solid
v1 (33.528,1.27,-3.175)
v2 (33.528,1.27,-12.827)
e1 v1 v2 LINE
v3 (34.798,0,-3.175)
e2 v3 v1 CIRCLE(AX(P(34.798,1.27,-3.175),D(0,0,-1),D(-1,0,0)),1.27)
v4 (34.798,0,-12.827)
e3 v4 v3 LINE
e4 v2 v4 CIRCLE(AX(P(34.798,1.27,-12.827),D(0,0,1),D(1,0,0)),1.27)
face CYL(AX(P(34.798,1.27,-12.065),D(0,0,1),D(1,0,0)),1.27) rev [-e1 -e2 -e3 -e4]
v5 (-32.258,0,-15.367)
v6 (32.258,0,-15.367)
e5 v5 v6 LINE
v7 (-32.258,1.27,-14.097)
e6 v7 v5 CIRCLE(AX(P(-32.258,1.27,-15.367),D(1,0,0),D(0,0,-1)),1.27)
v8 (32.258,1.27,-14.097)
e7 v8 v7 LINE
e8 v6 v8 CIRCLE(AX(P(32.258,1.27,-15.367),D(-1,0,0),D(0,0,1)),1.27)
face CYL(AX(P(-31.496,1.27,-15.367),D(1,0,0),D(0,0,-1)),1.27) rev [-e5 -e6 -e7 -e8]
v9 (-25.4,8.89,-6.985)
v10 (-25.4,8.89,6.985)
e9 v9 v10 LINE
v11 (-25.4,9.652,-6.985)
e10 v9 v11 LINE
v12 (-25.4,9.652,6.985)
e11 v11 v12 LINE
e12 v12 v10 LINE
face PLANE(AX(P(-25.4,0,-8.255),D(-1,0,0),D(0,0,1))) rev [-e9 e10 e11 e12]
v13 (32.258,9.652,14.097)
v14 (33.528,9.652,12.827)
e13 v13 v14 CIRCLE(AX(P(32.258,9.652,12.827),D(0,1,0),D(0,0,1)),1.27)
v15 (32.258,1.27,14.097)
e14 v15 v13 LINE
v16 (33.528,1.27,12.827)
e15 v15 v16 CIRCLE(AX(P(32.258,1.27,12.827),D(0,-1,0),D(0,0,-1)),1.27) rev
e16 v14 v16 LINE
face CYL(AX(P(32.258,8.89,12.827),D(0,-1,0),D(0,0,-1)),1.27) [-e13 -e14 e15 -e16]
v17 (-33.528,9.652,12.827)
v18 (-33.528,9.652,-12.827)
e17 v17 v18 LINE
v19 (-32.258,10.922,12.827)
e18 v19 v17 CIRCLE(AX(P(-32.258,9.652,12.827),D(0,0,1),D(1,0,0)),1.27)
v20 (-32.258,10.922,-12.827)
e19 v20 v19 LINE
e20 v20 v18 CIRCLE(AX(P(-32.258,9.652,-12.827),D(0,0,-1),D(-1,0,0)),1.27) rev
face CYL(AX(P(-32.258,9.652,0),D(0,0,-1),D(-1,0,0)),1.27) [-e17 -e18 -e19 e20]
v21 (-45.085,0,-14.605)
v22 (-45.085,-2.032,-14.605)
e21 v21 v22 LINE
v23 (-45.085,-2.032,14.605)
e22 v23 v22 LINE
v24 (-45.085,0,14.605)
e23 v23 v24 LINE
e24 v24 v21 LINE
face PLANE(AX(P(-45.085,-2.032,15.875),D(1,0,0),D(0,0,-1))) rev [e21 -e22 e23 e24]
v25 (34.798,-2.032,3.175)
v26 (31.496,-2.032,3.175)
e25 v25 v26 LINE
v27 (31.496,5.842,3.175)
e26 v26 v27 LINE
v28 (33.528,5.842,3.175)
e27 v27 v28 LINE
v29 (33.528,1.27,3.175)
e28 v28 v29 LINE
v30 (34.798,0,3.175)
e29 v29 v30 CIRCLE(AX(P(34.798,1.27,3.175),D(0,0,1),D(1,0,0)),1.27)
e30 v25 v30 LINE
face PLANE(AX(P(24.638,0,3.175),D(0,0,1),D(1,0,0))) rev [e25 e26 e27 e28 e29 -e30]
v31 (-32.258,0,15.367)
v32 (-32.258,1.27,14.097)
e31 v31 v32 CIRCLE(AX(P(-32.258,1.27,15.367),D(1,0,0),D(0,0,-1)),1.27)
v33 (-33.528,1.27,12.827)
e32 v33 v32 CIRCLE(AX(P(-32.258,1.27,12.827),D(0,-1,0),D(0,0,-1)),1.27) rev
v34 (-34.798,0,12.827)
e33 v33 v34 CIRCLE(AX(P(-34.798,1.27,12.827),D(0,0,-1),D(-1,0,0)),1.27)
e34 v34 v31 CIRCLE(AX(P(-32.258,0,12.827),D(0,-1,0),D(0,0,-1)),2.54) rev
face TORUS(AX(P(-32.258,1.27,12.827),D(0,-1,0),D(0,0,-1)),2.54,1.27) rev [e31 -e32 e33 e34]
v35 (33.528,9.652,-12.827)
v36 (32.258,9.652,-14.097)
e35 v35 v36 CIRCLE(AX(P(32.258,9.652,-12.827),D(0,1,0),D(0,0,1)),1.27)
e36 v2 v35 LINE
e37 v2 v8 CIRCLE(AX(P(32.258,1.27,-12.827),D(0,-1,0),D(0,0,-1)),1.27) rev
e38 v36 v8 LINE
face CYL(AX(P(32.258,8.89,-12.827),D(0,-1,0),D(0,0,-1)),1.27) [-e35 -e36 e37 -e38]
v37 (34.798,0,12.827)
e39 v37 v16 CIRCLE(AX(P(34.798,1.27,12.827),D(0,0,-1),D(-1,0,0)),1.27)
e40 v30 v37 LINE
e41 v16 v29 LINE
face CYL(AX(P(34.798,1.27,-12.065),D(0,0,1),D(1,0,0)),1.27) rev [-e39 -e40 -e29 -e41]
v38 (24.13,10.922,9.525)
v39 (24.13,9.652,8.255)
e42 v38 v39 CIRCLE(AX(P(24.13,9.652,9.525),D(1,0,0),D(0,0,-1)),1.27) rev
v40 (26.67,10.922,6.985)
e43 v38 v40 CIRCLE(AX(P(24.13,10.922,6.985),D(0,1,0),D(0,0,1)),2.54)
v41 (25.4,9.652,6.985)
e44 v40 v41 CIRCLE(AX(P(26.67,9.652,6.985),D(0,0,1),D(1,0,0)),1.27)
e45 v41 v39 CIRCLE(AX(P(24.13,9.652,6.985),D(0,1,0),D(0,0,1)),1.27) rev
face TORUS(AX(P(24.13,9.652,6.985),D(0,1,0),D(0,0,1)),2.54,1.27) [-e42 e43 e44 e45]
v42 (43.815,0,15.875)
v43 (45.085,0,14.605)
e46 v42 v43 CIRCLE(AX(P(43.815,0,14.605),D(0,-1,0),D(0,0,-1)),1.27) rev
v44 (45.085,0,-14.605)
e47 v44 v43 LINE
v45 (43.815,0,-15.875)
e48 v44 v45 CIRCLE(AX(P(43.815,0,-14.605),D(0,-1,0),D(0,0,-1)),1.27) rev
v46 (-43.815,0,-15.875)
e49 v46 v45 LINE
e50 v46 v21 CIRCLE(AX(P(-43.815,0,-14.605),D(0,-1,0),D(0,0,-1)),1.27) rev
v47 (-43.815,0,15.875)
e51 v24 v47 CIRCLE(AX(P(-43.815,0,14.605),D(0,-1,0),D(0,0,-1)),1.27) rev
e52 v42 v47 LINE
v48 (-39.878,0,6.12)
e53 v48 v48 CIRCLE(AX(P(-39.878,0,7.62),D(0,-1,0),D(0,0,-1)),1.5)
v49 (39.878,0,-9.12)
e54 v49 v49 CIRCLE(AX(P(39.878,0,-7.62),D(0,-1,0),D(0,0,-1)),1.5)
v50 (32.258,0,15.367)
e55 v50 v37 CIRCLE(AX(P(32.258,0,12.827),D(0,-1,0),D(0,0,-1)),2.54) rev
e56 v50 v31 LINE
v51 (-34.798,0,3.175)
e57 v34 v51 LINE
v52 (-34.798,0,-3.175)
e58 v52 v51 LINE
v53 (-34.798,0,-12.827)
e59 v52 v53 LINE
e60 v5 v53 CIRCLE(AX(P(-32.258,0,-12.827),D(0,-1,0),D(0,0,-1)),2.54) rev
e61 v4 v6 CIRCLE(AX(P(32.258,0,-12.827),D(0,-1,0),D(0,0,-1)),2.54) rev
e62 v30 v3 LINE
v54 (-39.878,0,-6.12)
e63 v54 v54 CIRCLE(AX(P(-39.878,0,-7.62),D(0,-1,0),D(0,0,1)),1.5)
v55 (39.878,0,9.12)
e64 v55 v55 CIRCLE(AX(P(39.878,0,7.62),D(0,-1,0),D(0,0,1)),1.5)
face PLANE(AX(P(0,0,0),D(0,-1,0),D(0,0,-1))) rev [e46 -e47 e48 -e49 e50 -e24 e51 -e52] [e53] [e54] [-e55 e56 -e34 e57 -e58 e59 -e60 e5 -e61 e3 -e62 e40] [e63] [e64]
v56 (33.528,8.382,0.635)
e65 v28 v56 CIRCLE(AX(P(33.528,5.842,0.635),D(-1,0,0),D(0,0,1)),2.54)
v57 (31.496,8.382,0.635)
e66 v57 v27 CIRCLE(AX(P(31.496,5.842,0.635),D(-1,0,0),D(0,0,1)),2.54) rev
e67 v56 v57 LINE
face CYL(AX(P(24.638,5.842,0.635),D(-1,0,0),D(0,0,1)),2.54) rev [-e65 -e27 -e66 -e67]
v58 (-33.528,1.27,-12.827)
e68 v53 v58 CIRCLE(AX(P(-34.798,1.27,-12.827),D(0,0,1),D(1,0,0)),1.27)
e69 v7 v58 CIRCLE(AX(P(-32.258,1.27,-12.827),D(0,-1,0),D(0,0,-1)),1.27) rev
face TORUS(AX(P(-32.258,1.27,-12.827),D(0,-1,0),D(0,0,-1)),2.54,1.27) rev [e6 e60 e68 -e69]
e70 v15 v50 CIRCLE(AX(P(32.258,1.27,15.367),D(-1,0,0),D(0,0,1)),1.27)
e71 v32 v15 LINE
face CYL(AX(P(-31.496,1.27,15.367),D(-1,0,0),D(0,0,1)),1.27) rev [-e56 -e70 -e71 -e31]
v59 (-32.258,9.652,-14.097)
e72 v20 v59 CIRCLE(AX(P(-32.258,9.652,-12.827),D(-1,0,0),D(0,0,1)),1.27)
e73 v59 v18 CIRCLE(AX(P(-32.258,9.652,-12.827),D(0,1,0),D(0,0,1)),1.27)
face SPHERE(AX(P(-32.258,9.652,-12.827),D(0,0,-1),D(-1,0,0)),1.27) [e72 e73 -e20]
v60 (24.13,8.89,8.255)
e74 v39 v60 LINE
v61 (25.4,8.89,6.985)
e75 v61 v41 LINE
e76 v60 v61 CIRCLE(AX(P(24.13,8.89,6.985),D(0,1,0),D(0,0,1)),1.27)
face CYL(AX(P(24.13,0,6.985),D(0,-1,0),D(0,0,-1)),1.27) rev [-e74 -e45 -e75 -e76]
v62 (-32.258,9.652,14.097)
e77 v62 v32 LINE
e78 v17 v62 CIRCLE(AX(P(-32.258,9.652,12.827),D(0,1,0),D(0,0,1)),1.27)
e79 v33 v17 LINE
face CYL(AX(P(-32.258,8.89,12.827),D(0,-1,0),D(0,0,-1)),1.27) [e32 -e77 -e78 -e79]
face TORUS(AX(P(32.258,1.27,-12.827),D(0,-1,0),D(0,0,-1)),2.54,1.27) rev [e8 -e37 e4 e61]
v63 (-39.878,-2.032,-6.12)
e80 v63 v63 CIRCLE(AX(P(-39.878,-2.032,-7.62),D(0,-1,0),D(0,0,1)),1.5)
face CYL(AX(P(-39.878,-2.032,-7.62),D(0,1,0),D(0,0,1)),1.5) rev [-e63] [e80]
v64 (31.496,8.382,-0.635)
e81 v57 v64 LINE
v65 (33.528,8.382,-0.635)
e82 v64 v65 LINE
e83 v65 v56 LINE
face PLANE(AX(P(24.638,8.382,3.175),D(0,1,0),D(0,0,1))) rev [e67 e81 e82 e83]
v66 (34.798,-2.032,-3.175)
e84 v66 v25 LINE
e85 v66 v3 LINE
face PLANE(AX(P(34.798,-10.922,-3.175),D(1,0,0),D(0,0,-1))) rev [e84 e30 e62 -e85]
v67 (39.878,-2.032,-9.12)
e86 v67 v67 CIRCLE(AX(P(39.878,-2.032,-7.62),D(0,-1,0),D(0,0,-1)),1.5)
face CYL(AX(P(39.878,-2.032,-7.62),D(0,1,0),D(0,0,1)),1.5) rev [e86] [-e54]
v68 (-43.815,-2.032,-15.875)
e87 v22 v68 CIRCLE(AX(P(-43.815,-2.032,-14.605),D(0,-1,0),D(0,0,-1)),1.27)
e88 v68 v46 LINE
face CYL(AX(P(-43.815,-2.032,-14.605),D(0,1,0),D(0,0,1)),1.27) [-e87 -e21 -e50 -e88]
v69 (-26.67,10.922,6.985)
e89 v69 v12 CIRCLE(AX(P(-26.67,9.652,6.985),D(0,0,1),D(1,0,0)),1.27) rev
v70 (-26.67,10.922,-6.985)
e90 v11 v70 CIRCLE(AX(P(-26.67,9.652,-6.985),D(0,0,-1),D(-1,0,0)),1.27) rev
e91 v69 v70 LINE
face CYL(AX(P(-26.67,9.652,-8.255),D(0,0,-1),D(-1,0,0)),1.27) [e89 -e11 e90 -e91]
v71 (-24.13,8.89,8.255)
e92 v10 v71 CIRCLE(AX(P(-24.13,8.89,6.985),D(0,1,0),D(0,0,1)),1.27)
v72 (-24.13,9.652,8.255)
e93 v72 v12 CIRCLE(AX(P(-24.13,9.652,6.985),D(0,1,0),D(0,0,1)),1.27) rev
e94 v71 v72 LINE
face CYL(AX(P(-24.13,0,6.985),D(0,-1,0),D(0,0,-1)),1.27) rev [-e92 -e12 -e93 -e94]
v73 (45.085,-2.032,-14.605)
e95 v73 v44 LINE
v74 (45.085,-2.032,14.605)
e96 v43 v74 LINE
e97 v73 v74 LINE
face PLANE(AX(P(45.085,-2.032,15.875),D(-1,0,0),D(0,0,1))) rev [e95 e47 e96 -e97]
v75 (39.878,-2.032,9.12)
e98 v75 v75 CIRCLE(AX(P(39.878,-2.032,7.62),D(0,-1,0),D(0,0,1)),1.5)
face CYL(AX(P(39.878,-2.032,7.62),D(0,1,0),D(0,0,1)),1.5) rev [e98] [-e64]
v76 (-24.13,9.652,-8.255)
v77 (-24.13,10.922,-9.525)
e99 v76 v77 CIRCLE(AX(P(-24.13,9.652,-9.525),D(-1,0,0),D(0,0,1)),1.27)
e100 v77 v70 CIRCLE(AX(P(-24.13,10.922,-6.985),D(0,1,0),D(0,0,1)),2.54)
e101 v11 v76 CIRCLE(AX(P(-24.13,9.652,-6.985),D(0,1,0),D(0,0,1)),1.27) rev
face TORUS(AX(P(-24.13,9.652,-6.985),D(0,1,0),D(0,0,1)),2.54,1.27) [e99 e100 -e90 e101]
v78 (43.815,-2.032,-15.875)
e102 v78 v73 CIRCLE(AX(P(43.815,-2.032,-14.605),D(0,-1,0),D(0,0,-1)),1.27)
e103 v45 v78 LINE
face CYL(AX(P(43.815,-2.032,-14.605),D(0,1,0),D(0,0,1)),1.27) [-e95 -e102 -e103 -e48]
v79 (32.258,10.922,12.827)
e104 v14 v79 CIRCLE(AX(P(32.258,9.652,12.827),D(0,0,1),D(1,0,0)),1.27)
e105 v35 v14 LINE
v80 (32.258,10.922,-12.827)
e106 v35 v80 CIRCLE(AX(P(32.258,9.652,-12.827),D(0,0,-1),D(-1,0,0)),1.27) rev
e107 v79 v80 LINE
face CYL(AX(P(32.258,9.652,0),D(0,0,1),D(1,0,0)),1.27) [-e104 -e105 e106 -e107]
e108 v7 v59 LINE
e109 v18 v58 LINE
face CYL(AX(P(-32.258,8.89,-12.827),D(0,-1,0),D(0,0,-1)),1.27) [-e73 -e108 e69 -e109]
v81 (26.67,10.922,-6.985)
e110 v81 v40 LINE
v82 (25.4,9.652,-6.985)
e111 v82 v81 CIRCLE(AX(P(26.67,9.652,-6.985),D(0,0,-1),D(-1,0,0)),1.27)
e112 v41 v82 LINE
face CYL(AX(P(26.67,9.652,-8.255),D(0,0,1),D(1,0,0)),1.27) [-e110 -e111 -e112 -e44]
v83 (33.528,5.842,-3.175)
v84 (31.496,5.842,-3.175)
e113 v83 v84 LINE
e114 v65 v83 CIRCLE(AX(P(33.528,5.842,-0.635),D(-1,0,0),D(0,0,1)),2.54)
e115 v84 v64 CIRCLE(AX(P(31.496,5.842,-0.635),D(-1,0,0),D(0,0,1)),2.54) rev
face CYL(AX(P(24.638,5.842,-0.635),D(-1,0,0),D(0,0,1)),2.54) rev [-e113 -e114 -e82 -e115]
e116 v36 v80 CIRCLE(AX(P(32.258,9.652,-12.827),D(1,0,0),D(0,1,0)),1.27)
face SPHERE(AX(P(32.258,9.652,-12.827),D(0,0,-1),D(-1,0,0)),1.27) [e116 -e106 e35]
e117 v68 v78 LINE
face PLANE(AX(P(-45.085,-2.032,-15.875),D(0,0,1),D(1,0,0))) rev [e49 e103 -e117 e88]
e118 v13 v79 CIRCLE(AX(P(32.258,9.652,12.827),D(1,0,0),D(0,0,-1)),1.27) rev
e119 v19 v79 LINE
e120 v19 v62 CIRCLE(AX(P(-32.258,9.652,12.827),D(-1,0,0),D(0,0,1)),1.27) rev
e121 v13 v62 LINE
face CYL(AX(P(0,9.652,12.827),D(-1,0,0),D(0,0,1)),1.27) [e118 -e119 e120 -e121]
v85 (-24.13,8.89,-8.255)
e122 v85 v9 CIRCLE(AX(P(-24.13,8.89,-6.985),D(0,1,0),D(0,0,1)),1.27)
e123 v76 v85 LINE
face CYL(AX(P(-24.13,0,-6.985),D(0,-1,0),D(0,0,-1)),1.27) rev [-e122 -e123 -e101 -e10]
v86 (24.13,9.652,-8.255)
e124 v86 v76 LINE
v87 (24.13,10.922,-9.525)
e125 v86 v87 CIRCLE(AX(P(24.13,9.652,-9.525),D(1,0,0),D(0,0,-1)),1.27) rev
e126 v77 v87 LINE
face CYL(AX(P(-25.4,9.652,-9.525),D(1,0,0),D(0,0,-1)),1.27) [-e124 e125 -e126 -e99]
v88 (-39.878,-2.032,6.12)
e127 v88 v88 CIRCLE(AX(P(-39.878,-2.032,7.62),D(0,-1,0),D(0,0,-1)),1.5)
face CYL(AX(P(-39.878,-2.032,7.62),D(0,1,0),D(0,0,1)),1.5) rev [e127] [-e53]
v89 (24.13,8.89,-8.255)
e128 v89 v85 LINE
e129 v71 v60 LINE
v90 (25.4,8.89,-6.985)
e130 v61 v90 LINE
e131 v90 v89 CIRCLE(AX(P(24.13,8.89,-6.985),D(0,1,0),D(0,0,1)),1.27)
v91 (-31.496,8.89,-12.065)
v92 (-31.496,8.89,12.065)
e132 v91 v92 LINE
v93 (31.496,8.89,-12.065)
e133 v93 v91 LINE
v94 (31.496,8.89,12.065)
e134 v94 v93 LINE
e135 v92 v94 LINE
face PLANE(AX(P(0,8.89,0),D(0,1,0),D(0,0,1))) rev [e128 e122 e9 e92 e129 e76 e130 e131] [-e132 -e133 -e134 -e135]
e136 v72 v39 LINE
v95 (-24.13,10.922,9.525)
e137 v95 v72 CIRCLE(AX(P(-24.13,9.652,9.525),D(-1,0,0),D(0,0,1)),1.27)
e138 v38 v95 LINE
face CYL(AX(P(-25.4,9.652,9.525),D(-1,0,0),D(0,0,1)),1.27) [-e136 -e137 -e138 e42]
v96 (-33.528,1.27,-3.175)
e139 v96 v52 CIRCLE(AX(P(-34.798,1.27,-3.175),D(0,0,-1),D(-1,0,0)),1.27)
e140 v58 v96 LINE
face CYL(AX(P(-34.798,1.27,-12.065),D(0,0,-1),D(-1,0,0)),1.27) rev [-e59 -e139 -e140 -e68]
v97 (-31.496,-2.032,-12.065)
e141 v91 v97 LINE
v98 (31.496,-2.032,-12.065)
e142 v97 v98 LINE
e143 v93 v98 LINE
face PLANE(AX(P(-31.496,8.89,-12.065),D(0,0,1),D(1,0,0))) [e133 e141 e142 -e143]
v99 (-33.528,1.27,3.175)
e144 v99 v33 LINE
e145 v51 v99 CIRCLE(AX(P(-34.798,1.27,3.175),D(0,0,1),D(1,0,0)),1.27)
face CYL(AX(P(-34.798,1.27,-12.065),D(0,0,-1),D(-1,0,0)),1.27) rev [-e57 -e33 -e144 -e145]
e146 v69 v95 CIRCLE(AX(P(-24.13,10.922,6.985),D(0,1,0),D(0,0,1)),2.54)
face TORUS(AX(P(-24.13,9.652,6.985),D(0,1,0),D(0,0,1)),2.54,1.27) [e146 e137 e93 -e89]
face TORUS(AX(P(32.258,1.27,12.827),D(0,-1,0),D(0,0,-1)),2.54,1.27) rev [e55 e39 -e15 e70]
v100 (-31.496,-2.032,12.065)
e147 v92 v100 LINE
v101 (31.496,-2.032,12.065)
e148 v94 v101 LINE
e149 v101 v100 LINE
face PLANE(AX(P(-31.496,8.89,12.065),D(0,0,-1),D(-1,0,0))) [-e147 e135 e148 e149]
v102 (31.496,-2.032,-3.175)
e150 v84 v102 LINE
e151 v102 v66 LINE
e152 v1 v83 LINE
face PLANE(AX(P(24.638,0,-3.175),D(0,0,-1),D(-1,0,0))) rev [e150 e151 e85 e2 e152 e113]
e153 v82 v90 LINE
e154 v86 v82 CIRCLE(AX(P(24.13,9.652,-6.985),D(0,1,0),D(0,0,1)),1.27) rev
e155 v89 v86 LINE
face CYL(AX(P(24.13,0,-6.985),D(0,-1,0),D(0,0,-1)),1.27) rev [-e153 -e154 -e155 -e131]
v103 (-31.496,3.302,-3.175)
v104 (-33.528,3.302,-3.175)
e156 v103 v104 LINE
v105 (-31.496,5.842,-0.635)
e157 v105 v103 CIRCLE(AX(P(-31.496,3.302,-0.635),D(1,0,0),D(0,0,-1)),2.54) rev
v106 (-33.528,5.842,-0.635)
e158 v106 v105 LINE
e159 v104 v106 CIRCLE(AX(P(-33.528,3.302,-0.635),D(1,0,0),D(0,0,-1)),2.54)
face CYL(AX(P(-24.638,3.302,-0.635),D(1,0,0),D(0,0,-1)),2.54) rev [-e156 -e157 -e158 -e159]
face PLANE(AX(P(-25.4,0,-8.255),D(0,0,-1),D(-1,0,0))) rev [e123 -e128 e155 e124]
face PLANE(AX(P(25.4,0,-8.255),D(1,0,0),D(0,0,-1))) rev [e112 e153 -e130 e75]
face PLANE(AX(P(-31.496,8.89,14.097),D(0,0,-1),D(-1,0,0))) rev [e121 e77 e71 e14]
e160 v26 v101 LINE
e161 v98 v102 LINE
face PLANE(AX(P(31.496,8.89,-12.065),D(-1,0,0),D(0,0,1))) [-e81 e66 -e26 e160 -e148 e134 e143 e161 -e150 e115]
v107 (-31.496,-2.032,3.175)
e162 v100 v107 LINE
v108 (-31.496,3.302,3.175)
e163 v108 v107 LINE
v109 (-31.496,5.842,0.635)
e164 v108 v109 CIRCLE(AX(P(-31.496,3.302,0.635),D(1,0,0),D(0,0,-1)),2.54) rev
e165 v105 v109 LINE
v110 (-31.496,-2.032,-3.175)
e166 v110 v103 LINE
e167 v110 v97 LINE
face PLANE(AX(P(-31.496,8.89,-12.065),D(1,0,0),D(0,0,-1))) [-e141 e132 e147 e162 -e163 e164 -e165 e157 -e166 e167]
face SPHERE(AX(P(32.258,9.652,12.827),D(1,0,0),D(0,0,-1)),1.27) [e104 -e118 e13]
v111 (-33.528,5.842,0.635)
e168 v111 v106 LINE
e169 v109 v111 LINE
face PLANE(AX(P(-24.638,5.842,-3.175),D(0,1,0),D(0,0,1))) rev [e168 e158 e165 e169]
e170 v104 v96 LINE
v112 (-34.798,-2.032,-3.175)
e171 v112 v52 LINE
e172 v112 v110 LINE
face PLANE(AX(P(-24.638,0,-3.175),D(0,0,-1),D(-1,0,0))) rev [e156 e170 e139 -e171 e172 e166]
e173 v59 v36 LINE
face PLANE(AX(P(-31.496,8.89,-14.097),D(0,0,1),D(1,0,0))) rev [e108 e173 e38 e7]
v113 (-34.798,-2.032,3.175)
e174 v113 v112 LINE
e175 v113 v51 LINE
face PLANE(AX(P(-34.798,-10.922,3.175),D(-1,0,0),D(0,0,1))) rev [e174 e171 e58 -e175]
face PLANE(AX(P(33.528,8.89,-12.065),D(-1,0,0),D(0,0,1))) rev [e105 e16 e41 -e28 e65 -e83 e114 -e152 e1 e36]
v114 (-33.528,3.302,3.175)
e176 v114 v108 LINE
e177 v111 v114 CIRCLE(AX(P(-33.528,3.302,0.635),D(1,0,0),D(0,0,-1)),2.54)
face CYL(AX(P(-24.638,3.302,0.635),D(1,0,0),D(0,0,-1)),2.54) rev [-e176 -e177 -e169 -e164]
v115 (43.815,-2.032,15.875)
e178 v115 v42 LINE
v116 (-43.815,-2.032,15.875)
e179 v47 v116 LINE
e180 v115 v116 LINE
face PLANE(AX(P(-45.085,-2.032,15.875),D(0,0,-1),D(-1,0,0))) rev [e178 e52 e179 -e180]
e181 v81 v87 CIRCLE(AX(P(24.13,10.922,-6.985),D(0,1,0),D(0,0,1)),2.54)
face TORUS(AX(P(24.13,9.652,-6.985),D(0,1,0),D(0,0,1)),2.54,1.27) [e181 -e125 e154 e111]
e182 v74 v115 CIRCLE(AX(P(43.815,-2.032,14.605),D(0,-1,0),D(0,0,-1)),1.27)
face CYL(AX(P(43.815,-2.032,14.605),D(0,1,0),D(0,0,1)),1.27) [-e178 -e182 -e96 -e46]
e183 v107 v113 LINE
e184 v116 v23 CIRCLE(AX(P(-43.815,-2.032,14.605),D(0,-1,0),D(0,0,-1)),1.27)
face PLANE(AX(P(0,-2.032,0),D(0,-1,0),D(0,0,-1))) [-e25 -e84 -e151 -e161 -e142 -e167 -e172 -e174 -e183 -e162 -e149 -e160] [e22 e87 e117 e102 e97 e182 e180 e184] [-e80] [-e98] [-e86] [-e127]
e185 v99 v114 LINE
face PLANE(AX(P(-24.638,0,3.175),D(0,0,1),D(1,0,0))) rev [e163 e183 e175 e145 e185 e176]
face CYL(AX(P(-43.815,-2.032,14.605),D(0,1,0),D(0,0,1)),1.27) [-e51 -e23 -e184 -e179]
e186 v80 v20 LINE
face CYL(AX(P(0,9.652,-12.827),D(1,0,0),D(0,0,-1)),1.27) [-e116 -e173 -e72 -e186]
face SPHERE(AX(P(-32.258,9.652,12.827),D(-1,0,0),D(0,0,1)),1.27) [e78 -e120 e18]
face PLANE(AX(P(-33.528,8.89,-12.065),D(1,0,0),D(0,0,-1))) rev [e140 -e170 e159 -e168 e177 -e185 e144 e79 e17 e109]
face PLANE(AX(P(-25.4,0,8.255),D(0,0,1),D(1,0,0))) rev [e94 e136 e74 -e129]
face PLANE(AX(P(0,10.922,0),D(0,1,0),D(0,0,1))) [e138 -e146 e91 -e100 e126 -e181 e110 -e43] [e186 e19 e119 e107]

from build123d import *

# Parameters (mm, degrees)
SKETCH1_W           = 62.992
SKETCH1_H           = 24.13
BOSS_EXTRUDE1_DEPTH = 8.89
SHELL1_T            = 2.032
SKETCH2_W           = 6.35
SKETCH2_H           = 5.842
CUT_EXTRUDE1_DEPTH  = 8.89
SKETCH3_W           = 6.35
SKETCH3_H           = 8.382
CUT_EXTRUDE2_DEPTH  = 8.89
FILLET1_R           = 2.54
SKETCH4_W           = 90.17
SKETCH4_H           = 31.75
SKETCH4_R           = 1.5
BOSS_EXTRUDE2_DEPTH = 2.032
SKETCH5_W           = 62.992
SKETCH5_H           = 24.13
CUT_EXTRUDE3_DEPTH  = 10.922
FILLET2_R           = 1.27
SKETCH6_W           = 50.8
SKETCH6_H           = 16.51
CUT_EXTRUDE4_DEPTH  = 10.922
FILLET3_R           = 1.27
SKETCH8_W           = 3.302
SKETCH8_H           = 6.35
CUT_EXTRUDE5_DEPTH  = 10.922


with BuildPart() as part:
    # Sketch1 → Boss-Extrude1 (new body)
    with BuildSketch(Plane(origin=(0, 0, 0), x_dir=(1, 0, 0), z_dir=(0, 1, 0))):
        Rectangle(SKETCH1_W, SKETCH1_H)
    extrude(amount=BOSS_EXTRUDE1_DEPTH)

    # Shell1
    shell1_openings = [part.faces().sort_by_distance(p)[0] for p in [
        (0, 0, 0),
    ]]
    offset(amount=SHELL1_T, openings=shell1_openings, kind=Kind.INTERSECTION)

    # Sketch2 → Cut-Extrude1 (cut)
    with BuildSketch(Plane.ZY.offset(33.528)):
        with Locations((0, 2.921)):
            Rectangle(SKETCH2_W, SKETCH2_H)
    extrude(amount=-CUT_EXTRUDE1_DEPTH, mode=Mode.SUBTRACT)

    # Sketch3 → Cut-Extrude2 (cut)
    with BuildSketch(Plane(origin=(33.528, 0, 0), x_dir=(0, 0, -1), z_dir=(1, 0, 0))):
        with Locations((0, 4.191)):
            Rectangle(SKETCH3_W, SKETCH3_H)
    extrude(amount=-CUT_EXTRUDE2_DEPTH, mode=Mode.SUBTRACT)

    # Fillet1
    fillet1_edges = [part.edges().sort_by_distance(p)[0] for p in [
        (-32.512, 5.842, 3.175),
        (-32.512, 5.842, -3.175),
        (32.512, 8.382, -3.175),
        (32.512, 8.382, 3.175),
    ]]
    fillet(fillet1_edges, radius=FILLET1_R)

    # Sketch4 → Boss-Extrude2 (add)
    with BuildSketch(Plane.XZ):
        Rectangle(SKETCH4_W, SKETCH4_H)
        with Locations((-39.878, 7.62)):
            Circle(SKETCH4_R, mode=Mode.SUBTRACT)
        with Locations((-39.878, -7.62)):
            Circle(SKETCH4_R, mode=Mode.SUBTRACT)
        with Locations((39.878, -7.62)):
            Circle(SKETCH4_R, mode=Mode.SUBTRACT)
        with Locations((39.878, 7.62)):
            Circle(SKETCH4_R, mode=Mode.SUBTRACT)
    extrude(amount=BOSS_EXTRUDE2_DEPTH)

    # Sketch5 → Cut-Extrude3 (cut)
    with BuildSketch(Plane.XZ.offset(2.032)):
        Rectangle(SKETCH5_W, SKETCH5_H)
    extrude(amount=-CUT_EXTRUDE3_DEPTH, mode=Mode.SUBTRACT)

    # Fillet2
    fillet2_edges = [part.edges().sort_by_distance(p)[0] for p in [
        (0, 10.922, 14.097),
        (-33.528, 10.922, 0),
        (0, 10.922, -14.097),
        (33.528, 10.922, 0),
        (-45.085, -1.016, 15.875),
        (-45.085, -1.016, -15.875),
        (45.085, -1.016, -15.875),
        (45.085, -1.016, 15.875),
        (-33.528, 5.461, -14.097),
        (-33.528, 5.461, 14.097),
        (33.528, 5.461, 14.097),
        (33.528, 5.461, -14.097),
    ]]
    fillet(fillet2_edges, radius=FILLET2_R)
    fillet2_2_edges = [part.edges().sort_by_distance(p)[0] for p in [
        (0, 0, -14.097),
        (33.528, 0, -8.001),
        (33.528, 0, 8.001),
        (0, 0, 14.097),
        (-33.528, 0, 8.001),
        (-33.528, 0, -8.001),
        (-33.156025612, 0, -13.725025612),
        (-33.156025612, 0, 13.725025612),
        (33.156025612, 0, 13.725025612),
        (33.156025612, 0, -13.725025612),
    ]]
    fillet(fillet2_2_edges, radius=FILLET2_R)

    # Sketch6 → Cut-Extrude4 (cut)
    with BuildSketch(Plane(origin=(0, 10.922, 0), x_dir=(1, 0, 0), z_dir=(0, 1, 0))):
        Rectangle(SKETCH6_W, SKETCH6_H)
    extrude(amount=-CUT_EXTRUDE4_DEPTH, mode=Mode.SUBTRACT)

    # Fillet3
    fillet3_edges = [part.edges().sort_by_distance(p)[0] for p in [
        (-25.4, 10.922, 0),
        (0, 10.922, 8.255),
        (0, 10.922, -8.255),
        (25.4, 10.922, 0),
        (25.4, 9.906, -8.255),
        (25.4, 9.906, 8.255),
        (-25.4, 9.906, -8.255),
        (-25.4, 9.906, 8.255),
    ]]
    fillet(fillet3_edges, radius=FILLET3_R)

    # Sketch8 → Cut-Extrude5 (cut)
    with BuildSketch(Plane(origin=(0, 0, 0), x_dir=(1, 0, 0), z_dir=(0, 1, 0))):
        with Locations((-33.147, 0)):
            Rectangle(SKETCH8_W, SKETCH8_H)
        with Locations((33.147, 0)):
            Rectangle(SKETCH8_W, SKETCH8_H)
    extrude(amount=-CUT_EXTRUDE5_DEPTH, mode=Mode.SUBTRACT)


solid = part.part
